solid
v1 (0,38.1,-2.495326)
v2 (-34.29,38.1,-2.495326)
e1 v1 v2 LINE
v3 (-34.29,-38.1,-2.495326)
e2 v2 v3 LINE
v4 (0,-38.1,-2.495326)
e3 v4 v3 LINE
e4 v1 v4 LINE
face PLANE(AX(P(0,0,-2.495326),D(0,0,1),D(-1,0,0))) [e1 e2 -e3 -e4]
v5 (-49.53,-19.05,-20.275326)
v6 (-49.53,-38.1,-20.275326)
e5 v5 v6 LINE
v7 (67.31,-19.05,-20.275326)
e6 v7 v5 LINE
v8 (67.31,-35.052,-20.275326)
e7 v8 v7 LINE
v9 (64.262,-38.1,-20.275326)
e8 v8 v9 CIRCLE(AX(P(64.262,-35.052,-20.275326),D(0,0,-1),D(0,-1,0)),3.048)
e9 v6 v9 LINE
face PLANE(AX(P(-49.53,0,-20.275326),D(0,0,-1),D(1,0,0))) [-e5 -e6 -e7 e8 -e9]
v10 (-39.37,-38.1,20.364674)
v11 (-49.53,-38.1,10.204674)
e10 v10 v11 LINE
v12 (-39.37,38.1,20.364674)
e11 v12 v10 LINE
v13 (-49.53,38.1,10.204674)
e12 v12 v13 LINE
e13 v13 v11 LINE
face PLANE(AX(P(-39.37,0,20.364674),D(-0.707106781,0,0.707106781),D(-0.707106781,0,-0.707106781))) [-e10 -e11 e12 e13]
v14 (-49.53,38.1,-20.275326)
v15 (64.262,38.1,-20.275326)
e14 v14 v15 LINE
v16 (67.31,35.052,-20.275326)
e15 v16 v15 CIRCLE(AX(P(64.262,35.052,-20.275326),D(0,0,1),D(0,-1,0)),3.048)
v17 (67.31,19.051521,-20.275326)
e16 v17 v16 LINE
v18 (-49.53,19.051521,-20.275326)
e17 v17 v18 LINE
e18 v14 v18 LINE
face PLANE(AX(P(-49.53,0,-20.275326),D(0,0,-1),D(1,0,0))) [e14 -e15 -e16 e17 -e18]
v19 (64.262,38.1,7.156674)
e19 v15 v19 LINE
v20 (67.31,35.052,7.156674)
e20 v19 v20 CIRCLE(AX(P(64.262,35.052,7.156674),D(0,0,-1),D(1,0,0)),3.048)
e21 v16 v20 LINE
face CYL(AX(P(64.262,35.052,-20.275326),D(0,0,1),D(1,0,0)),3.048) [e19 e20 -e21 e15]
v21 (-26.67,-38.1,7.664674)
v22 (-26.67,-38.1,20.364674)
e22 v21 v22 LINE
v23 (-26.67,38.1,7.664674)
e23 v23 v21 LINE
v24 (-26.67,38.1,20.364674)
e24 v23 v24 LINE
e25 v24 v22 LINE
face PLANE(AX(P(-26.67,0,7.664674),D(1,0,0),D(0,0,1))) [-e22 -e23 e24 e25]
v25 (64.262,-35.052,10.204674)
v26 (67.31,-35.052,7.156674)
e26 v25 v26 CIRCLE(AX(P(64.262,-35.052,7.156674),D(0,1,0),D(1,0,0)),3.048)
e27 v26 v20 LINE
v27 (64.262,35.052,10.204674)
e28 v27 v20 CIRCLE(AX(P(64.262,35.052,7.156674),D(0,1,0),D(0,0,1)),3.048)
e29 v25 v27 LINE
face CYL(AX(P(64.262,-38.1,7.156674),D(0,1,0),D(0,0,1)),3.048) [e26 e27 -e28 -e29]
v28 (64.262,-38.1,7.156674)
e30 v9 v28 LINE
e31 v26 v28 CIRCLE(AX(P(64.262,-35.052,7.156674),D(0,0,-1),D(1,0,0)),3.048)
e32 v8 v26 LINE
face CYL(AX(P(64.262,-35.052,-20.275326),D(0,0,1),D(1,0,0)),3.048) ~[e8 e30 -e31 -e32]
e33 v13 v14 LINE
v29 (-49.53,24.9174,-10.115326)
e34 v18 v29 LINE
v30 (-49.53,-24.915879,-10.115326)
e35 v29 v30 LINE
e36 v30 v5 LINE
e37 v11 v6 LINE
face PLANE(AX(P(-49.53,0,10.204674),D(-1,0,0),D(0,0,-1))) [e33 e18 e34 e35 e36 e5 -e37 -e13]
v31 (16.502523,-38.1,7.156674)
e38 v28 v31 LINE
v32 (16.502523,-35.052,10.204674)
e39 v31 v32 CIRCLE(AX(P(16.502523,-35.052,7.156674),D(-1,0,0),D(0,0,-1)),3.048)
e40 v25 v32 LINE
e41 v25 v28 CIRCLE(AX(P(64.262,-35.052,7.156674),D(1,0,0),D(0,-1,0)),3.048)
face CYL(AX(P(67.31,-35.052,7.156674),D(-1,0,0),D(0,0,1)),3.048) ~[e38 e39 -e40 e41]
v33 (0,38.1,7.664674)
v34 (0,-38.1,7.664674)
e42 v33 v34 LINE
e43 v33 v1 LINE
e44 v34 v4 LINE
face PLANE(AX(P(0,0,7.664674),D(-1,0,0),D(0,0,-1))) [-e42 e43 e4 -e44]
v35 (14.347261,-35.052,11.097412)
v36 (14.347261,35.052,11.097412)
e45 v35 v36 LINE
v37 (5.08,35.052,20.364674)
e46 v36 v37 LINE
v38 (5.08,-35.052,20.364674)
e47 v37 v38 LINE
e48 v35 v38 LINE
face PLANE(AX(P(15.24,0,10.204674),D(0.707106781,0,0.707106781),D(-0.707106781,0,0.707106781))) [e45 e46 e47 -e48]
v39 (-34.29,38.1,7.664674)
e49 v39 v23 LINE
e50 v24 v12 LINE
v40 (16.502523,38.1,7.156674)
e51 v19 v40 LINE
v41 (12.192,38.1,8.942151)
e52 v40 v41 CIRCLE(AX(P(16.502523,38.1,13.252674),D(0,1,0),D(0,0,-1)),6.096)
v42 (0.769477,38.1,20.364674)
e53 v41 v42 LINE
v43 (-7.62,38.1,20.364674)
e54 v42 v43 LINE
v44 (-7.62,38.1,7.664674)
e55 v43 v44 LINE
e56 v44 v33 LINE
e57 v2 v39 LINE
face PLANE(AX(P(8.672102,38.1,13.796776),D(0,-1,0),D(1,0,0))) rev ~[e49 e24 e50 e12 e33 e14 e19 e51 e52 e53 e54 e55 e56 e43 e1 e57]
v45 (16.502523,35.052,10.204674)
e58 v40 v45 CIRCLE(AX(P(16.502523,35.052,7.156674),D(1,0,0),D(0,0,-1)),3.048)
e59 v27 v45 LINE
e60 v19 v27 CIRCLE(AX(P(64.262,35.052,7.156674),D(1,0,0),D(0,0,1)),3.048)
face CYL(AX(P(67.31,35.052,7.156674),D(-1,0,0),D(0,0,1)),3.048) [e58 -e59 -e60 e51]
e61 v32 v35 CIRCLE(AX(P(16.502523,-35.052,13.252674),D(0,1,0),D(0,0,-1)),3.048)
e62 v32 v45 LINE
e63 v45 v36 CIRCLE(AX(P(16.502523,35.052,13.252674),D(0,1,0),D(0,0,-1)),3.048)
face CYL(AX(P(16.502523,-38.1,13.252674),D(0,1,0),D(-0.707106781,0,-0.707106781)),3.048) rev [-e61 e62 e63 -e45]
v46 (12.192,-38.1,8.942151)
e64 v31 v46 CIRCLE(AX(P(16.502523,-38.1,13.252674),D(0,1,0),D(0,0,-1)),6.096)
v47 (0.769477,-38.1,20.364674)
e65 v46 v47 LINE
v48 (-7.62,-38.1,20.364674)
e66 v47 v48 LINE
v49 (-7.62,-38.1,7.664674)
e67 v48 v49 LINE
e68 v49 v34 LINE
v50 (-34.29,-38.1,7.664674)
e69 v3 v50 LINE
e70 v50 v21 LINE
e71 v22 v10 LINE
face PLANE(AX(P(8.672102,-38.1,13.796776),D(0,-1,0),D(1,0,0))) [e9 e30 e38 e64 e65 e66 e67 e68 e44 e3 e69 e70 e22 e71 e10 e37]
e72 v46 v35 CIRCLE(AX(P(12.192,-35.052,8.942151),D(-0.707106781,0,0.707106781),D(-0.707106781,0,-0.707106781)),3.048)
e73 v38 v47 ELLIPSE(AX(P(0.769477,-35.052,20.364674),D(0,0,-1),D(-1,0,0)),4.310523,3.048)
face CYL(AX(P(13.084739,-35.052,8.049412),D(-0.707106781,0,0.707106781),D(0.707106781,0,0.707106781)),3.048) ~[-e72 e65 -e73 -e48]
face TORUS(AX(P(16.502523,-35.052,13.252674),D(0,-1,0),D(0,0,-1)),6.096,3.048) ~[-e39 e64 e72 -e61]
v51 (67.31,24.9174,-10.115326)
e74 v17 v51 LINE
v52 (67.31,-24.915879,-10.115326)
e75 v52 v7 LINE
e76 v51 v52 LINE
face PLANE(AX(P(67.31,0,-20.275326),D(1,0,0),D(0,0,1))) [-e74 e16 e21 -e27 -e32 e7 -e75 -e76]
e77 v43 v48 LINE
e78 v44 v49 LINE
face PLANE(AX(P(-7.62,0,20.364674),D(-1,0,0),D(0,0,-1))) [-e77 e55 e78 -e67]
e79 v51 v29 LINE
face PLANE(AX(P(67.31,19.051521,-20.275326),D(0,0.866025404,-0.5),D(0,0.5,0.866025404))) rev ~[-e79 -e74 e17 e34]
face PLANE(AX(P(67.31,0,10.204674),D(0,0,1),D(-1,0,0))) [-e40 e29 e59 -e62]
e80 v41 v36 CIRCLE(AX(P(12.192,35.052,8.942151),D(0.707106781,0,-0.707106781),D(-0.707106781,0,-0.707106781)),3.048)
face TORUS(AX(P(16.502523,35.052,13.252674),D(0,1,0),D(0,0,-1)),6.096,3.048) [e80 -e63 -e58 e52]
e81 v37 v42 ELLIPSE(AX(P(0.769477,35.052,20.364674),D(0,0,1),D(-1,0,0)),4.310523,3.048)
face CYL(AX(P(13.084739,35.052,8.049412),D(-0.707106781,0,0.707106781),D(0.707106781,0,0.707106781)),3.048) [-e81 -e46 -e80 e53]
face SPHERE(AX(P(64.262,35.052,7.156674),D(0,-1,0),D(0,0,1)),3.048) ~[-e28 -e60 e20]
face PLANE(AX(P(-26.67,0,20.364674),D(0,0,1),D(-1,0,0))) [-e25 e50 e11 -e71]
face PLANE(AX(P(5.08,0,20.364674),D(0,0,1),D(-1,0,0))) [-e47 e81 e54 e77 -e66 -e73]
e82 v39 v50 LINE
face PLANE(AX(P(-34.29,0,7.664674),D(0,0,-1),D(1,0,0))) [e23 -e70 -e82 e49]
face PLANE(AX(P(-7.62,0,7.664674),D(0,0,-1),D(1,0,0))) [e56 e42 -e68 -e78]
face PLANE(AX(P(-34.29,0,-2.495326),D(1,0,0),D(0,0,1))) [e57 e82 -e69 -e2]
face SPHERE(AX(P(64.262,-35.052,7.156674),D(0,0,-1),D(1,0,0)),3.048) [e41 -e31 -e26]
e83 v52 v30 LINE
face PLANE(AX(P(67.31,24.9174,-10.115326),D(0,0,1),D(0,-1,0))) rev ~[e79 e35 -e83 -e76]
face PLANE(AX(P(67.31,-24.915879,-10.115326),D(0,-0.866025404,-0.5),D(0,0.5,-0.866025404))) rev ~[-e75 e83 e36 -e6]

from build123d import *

# Parameters (mm, degrees)
F1_DEPTH = 38.1
F2_R     = 3.048
F4_DEPTH = 116.84


with BuildPart() as f1:
    # F0 (on Front) → F1 (new body, symmetric)
    with BuildSketch(Plane.XZ):
        Polygon((5.08, 10.2046737447), (15.24, 10.2046737447), (5.08, 20.3646737447), align=None)
        Polygon((-49.53, -20.2753262553), (67.31, -20.2753262553), (67.31, 10.2046737447), (15.24, 10.2046737447), (5.08, 10.2046737447), (5.08, 20.3646737447), (-7.62, 20.3646737447), (-7.62, 7.6646737447), (0, 7.6646737447), (0, -2.4953262553), (-34.29, -2.4953262553), (-34.29, 7.6646737447), (-26.67, 7.6646737447), (-26.67, 20.3646737447), (-39.37, 20.3646737447), (-49.53, 10.2046737447), align=None)
    extrude(amount=F1_DEPTH, both=True)

    # F2
    f2_edges = [f1.edges().sort_by_distance(p)[0] for p in [
        (10.16, -38.1, 15.284674),
        (15.24, 0, 10.204674),
        (67.31, -38.1, -5.035326),
        (67.31, 0, 10.204674),
        (41.275, 38.1, 10.204674),
        (67.31, 38.1, -5.035326),
        (10.16, 38.1, 15.284674),
        (41.275, -38.1, 10.204674),
    ]]
    fillet(f2_edges, radius=F2_R)

    # F3 (on face) → F4 (cut)
    with BuildSketch(Plane.YZ.offset(67.31)):
        Polygon((-19.05, -20.2753262553), (0, -20.2753262553), (19.05, -20.2753262553), (19.051521265, -20.2753262553), (24.9174, -10.1153262553), (0, -10.1153262553), (-24.915878735, -10.1153262553), align=None)
    extrude(amount=-F4_DEPTH, mode=Mode.SUBTRACT)


solid = f1.part
